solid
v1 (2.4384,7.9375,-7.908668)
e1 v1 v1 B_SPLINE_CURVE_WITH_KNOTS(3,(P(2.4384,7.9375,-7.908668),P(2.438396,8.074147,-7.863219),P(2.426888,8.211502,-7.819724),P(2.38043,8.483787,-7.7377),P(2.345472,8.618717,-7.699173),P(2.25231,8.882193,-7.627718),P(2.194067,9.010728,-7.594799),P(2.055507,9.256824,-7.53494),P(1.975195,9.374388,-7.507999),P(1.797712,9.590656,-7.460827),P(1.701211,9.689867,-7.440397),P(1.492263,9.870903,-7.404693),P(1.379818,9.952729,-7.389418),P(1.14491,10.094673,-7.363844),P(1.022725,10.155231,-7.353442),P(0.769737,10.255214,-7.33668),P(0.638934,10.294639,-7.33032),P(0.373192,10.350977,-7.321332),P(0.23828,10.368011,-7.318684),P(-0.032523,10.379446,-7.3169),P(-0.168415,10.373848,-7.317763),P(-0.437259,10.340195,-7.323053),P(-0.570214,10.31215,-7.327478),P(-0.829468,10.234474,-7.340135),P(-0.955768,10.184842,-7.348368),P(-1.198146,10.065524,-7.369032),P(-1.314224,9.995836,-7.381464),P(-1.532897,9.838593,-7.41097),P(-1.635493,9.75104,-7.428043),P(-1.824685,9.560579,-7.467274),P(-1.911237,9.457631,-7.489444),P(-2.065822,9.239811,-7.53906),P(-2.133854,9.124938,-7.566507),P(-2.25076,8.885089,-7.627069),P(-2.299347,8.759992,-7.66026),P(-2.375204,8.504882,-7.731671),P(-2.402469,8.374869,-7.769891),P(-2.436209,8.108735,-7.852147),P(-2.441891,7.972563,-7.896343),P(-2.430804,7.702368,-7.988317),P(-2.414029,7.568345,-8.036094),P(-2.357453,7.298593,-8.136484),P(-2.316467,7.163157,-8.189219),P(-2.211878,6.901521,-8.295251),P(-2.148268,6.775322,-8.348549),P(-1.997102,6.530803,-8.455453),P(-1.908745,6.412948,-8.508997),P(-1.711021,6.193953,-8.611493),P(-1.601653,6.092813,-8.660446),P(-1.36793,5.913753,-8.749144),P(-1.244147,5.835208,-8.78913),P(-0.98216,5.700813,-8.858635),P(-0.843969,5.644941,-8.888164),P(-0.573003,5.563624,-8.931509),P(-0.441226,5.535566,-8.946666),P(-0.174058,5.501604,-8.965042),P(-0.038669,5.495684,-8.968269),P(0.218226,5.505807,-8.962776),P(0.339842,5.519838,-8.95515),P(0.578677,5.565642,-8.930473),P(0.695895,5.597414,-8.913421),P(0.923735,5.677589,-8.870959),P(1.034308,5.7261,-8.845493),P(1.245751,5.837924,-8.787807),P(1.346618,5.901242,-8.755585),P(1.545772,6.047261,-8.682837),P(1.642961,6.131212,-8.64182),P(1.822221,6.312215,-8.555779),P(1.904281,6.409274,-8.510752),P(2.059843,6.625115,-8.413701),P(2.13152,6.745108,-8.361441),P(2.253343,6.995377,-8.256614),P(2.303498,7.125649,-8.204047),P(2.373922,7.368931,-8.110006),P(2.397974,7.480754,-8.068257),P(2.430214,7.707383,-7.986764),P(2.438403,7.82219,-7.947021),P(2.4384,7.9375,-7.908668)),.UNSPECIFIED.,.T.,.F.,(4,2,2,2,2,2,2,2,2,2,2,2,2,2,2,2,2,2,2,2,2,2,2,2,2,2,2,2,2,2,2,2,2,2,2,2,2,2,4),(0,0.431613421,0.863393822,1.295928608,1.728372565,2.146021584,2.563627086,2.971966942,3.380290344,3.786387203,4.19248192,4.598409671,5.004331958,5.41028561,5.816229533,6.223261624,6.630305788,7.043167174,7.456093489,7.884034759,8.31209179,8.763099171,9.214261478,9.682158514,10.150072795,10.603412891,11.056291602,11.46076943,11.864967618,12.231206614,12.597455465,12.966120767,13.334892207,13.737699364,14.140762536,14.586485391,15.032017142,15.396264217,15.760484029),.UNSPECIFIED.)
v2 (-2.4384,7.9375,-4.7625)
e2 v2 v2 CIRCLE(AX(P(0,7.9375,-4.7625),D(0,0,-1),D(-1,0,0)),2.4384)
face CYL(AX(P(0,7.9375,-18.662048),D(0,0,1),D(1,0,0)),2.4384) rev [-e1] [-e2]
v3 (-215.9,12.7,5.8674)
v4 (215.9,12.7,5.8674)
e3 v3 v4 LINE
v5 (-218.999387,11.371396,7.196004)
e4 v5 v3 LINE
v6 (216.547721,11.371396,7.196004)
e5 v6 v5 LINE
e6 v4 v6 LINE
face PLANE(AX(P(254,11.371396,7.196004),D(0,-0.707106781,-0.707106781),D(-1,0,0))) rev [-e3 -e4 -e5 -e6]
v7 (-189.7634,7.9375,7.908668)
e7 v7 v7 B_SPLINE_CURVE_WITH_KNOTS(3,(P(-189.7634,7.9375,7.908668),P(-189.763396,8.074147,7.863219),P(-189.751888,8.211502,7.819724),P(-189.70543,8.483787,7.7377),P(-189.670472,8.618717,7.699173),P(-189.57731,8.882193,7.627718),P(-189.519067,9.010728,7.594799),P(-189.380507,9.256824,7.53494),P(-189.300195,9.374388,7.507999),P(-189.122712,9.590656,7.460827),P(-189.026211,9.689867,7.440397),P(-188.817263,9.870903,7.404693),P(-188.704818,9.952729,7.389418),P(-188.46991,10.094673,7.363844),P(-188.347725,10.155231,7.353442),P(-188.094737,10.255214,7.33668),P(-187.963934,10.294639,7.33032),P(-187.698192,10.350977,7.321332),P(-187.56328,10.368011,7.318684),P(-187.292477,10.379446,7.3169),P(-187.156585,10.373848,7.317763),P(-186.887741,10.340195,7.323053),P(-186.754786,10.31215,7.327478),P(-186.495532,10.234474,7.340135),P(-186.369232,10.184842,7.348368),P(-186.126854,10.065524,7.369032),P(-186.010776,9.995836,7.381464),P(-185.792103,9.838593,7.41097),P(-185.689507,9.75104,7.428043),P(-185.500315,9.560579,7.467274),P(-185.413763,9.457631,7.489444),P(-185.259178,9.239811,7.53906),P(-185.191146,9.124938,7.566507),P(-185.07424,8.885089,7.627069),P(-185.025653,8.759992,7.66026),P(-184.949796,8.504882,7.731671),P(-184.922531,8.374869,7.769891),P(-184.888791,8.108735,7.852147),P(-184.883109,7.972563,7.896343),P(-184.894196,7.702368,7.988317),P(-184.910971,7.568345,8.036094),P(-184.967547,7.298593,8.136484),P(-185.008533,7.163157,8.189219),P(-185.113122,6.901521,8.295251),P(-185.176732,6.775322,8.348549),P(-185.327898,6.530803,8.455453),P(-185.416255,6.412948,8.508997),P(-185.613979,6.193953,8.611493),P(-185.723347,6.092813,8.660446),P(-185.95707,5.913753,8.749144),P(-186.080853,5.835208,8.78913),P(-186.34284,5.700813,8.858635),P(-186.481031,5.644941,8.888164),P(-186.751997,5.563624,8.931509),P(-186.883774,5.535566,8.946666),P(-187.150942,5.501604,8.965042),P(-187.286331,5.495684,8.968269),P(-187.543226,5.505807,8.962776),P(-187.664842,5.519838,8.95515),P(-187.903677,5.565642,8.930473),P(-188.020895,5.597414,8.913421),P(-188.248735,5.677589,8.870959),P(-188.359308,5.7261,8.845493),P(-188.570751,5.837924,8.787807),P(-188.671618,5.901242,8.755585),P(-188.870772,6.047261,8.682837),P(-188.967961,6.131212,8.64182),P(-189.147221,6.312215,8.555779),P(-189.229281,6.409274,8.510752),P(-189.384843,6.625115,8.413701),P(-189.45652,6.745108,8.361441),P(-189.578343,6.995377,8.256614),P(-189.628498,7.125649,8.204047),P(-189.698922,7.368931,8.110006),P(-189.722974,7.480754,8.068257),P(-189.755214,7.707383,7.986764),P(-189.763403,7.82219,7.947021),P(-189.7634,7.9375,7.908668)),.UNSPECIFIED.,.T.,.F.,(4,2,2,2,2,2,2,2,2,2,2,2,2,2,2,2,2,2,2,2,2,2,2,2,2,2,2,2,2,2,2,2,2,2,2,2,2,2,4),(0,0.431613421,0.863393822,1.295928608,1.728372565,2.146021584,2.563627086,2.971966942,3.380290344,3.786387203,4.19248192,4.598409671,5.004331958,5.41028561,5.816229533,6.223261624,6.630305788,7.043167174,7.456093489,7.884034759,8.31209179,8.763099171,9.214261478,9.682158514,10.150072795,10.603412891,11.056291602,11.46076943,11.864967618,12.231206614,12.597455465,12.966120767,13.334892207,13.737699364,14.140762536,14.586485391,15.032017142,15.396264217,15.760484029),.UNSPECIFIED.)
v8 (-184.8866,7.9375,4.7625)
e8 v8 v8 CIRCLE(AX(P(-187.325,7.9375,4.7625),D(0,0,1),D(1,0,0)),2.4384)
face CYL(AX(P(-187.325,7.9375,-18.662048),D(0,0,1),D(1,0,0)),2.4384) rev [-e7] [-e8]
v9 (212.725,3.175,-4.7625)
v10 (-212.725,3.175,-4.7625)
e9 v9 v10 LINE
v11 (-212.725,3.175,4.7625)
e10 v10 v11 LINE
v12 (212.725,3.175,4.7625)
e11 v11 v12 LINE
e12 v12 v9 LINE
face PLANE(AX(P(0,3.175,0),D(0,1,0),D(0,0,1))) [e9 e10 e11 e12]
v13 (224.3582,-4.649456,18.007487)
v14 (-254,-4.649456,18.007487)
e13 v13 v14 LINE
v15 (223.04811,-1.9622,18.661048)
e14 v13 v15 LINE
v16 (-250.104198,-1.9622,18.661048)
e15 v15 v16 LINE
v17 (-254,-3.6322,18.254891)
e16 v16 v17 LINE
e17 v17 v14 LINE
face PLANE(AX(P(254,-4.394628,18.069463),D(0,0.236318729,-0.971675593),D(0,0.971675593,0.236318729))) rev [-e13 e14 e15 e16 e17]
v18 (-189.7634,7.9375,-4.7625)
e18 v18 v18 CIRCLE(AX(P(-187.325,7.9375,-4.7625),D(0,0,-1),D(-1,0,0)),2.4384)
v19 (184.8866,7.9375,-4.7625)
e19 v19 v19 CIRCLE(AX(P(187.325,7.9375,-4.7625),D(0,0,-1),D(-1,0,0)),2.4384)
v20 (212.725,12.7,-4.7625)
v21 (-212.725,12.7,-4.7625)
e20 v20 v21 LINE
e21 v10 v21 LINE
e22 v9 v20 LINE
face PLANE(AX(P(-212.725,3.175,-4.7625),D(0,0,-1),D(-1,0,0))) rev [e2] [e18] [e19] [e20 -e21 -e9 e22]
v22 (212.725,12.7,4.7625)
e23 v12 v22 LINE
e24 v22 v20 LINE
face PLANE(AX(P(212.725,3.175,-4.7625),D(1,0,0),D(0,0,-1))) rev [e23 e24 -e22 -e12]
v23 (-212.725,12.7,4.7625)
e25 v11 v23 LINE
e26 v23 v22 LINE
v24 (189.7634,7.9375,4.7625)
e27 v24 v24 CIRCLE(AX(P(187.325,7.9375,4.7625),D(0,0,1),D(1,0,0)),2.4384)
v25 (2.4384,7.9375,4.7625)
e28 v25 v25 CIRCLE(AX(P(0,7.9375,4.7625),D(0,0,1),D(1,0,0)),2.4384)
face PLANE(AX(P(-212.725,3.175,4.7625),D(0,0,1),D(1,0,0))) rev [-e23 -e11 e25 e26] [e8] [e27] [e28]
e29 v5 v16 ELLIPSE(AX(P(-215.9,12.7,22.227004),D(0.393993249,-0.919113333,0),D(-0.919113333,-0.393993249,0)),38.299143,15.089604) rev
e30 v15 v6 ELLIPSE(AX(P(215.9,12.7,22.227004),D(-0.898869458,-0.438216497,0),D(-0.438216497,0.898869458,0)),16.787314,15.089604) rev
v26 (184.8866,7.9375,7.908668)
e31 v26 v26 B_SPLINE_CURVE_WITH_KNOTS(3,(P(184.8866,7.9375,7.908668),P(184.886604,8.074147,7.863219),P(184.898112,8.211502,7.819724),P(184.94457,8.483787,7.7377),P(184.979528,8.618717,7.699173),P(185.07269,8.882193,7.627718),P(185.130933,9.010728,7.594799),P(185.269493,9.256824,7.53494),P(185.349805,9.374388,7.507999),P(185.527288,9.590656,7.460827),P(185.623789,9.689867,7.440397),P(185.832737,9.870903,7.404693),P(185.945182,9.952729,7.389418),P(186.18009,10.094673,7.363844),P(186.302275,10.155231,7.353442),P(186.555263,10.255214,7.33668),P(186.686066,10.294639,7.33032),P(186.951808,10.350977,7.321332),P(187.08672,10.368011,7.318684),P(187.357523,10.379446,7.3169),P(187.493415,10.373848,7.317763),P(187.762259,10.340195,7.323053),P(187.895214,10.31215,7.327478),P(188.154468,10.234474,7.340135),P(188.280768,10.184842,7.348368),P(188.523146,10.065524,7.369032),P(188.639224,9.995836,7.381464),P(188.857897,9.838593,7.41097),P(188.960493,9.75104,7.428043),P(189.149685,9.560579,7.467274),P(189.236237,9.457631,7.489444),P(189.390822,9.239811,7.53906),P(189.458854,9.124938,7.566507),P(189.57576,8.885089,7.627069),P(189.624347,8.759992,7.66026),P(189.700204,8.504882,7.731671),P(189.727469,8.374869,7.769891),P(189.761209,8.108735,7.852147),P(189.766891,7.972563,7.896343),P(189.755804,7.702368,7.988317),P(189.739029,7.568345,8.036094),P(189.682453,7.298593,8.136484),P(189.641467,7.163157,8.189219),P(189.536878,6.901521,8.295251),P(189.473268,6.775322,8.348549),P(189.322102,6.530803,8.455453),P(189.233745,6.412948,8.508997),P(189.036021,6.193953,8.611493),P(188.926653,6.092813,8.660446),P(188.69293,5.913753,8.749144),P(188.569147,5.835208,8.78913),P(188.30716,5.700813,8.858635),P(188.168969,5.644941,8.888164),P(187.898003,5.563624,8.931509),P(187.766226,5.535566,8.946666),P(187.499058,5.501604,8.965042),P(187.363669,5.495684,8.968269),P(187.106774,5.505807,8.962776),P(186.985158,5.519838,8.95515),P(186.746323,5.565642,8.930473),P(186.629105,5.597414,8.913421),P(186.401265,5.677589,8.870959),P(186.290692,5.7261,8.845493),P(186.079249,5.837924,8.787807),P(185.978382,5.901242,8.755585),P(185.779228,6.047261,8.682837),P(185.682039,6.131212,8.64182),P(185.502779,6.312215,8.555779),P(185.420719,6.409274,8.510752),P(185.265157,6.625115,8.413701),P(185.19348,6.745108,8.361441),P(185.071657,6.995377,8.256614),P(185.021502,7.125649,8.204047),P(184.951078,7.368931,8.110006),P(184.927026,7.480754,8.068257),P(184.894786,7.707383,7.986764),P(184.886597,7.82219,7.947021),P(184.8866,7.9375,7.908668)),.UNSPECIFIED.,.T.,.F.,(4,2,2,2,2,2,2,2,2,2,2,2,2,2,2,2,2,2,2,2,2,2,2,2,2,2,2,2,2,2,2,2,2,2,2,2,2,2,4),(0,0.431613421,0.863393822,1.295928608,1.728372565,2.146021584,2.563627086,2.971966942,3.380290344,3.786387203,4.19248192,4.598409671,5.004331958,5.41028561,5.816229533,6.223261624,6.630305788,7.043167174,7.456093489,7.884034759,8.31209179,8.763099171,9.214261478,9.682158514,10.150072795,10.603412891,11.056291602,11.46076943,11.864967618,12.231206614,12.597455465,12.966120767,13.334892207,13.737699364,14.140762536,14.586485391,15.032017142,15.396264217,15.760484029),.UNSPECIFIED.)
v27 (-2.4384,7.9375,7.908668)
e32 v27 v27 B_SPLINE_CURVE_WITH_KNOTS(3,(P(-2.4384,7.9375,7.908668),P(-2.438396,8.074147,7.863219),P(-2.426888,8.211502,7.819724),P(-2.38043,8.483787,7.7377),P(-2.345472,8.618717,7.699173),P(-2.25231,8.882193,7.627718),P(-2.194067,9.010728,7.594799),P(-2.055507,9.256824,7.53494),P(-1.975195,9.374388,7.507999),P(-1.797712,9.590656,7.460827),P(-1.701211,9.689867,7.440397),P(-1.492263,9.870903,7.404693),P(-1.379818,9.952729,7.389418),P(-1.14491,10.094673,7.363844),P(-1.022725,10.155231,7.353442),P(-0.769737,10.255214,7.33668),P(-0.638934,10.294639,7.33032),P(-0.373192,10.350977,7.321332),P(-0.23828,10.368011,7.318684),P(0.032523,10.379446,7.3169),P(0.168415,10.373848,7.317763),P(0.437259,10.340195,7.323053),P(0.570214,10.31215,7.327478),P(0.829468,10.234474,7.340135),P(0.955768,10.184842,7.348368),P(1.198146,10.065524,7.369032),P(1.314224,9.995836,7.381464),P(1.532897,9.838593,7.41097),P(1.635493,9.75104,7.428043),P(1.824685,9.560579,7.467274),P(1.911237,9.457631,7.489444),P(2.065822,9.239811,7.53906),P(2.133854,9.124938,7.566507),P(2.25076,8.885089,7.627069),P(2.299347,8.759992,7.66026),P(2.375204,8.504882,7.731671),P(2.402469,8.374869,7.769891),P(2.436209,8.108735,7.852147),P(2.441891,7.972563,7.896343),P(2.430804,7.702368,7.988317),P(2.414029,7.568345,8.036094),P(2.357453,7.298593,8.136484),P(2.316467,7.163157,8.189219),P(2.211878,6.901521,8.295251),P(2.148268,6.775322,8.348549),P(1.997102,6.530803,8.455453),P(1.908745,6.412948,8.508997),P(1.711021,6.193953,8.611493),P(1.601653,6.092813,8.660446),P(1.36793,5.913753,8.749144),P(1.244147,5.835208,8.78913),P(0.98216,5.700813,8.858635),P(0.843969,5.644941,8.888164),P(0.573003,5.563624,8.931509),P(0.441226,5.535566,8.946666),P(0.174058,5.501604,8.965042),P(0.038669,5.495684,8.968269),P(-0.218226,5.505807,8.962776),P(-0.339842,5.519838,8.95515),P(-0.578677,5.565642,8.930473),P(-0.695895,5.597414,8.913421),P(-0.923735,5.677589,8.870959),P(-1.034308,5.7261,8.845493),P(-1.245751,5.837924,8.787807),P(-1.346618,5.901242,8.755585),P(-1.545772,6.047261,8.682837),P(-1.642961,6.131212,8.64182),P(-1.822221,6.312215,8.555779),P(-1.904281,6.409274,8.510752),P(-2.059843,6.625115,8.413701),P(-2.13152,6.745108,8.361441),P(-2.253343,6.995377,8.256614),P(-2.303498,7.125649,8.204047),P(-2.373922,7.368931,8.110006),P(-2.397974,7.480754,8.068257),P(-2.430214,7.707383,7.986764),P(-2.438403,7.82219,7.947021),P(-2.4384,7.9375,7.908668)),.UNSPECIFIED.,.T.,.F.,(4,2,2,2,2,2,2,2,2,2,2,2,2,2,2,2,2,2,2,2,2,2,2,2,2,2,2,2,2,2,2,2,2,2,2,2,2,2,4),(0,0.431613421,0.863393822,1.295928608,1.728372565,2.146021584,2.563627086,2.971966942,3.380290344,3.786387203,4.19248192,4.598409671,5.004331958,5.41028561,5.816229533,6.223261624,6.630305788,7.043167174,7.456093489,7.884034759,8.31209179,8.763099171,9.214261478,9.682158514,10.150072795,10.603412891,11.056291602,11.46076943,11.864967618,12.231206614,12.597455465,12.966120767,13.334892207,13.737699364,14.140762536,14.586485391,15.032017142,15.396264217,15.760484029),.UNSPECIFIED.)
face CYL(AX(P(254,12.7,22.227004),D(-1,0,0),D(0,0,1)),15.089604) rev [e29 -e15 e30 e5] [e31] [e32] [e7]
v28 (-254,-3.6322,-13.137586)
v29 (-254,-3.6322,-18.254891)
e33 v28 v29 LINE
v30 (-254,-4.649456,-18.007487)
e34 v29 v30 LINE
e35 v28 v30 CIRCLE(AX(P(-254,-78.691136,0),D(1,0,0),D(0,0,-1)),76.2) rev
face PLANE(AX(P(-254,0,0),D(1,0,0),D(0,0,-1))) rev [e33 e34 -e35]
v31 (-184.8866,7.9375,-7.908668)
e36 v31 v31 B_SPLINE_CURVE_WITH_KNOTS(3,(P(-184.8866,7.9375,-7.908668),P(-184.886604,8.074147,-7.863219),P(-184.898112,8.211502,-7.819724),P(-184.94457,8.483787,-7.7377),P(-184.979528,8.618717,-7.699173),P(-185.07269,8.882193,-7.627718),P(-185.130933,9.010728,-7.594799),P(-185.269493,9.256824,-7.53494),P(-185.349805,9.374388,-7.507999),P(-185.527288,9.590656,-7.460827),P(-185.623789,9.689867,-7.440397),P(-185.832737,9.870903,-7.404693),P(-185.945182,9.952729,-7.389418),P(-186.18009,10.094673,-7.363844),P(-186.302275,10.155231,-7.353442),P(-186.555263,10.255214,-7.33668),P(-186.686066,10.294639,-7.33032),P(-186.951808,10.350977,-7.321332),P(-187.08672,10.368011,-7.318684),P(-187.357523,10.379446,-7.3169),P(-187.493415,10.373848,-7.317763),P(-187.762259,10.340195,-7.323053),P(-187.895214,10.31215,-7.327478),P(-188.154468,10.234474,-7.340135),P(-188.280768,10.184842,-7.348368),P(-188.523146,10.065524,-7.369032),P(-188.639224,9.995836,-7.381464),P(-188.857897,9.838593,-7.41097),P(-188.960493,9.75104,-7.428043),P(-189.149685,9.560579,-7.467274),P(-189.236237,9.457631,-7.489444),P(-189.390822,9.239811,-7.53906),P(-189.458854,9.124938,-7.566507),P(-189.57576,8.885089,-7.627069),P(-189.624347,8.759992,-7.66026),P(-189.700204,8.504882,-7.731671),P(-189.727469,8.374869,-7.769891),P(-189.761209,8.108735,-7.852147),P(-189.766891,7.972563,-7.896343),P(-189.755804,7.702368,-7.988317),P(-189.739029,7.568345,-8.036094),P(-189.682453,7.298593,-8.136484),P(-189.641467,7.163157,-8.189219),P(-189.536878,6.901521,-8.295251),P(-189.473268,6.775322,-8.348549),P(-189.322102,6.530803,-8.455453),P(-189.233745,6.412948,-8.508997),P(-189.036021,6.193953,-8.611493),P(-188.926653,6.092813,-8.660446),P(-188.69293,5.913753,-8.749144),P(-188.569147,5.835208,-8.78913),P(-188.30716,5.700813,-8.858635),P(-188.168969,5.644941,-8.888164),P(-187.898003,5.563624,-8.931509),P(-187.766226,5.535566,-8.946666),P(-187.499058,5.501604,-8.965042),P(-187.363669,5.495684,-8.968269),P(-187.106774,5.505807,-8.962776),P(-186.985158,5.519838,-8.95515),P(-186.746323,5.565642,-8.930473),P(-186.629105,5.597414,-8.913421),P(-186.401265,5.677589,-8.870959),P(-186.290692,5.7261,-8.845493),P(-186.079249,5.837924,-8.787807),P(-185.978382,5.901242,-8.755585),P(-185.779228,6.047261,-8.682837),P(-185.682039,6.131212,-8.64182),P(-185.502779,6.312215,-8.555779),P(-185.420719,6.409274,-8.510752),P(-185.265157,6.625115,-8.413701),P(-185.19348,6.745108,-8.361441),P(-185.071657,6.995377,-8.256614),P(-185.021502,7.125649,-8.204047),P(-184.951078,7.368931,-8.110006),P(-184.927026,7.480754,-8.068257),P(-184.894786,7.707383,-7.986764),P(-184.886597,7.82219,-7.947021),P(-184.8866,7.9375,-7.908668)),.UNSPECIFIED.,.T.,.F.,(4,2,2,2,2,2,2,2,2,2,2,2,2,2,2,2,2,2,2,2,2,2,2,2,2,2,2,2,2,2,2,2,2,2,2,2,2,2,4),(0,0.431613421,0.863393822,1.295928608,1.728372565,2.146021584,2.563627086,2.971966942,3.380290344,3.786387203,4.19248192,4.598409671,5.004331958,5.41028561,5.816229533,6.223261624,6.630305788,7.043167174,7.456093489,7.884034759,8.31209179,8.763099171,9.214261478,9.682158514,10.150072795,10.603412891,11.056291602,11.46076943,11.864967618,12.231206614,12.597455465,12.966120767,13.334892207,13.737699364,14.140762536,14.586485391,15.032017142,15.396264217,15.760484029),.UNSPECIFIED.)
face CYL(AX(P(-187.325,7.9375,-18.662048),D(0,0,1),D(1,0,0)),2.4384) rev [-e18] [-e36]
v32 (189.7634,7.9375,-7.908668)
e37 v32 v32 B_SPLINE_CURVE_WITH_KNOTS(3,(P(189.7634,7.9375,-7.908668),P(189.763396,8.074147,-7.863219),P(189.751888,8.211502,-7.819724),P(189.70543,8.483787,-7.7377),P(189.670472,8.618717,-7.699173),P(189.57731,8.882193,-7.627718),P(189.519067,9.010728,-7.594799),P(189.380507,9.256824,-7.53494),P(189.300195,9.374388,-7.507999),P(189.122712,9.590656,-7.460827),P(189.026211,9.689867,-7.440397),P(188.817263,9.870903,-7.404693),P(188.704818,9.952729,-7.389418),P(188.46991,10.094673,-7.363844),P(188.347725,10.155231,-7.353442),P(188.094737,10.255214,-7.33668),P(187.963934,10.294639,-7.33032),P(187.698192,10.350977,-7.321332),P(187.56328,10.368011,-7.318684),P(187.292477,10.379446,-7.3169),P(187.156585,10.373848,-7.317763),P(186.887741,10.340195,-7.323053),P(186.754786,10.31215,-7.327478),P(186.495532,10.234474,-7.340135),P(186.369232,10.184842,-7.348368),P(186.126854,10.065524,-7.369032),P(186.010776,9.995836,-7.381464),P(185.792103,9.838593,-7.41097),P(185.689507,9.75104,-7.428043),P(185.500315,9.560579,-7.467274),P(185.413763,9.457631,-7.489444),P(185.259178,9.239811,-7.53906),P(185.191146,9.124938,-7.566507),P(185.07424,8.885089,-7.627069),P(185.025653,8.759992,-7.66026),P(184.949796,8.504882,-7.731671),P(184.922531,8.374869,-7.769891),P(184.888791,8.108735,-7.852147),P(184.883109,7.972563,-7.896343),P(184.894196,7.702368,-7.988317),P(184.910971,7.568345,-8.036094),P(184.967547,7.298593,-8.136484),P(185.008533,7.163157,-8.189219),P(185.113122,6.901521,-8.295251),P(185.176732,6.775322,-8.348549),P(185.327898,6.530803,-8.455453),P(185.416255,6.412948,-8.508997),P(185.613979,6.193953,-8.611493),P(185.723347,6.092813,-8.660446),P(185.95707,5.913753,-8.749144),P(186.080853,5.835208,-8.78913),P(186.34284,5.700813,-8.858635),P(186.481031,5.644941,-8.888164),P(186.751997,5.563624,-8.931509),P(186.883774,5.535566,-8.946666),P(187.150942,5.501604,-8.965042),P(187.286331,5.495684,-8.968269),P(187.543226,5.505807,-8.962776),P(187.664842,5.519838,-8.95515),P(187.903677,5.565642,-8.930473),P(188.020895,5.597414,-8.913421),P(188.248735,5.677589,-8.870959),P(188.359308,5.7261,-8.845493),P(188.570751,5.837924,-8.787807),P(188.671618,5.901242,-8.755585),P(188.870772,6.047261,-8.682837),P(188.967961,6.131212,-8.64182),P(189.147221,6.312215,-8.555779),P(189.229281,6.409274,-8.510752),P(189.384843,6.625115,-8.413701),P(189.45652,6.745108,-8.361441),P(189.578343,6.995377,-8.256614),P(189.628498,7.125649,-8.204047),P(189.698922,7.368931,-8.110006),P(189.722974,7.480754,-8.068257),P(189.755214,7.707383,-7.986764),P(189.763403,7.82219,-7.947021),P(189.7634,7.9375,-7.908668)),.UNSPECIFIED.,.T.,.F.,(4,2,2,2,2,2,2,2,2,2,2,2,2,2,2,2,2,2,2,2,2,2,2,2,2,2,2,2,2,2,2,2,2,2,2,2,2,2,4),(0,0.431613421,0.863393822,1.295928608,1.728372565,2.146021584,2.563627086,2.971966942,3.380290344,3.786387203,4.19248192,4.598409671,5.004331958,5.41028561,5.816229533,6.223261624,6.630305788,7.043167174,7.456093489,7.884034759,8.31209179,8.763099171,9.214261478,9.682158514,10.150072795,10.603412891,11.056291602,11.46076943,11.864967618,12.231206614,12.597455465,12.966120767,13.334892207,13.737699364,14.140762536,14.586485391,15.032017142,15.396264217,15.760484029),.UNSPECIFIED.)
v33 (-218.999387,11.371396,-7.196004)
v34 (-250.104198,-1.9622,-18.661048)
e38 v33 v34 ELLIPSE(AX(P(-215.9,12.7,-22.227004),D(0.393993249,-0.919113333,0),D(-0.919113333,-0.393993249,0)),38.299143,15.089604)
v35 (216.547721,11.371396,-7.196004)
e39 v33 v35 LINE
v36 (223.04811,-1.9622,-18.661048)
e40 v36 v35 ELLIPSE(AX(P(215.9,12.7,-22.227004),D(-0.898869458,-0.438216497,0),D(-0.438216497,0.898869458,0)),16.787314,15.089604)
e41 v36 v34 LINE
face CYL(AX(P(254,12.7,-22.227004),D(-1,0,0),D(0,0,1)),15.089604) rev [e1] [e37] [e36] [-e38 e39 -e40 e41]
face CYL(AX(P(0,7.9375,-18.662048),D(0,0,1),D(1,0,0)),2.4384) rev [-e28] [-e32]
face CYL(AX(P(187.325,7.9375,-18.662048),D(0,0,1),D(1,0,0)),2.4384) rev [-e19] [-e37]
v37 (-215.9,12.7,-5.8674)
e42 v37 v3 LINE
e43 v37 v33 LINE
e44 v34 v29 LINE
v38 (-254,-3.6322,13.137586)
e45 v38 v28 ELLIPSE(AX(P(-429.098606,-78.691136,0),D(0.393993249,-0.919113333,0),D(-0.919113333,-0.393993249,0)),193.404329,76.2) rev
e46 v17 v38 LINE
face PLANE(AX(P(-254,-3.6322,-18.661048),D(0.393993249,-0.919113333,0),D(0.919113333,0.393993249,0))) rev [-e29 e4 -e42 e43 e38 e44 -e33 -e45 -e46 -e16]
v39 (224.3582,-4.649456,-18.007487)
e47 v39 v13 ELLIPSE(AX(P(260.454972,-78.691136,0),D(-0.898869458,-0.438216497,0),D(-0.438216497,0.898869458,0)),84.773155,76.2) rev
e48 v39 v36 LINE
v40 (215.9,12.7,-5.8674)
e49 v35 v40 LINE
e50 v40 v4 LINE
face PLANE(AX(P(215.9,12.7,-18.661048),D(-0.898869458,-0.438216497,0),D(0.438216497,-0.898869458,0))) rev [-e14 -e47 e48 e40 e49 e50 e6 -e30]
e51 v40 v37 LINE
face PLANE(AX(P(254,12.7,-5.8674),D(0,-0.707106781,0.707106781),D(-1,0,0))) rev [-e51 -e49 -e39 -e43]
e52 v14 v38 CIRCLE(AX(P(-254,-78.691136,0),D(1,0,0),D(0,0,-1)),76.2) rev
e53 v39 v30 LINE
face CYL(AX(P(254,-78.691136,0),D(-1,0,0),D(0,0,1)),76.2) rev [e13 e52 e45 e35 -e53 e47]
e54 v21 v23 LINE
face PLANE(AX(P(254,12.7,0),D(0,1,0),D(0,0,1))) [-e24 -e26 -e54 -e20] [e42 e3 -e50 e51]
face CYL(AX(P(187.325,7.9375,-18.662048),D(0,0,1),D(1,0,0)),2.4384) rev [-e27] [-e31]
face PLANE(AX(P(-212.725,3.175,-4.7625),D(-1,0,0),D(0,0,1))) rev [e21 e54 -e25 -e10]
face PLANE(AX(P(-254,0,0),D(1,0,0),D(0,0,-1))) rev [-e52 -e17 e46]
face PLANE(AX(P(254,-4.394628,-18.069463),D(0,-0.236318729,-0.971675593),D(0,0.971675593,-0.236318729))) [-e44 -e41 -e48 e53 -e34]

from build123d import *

# Parameters (mm, degrees)
BOSS_EXTRUDE1_DEPTH                 = 254
CUT_EXTRUDE1_DEPTH                  = 263.150751027
SKETCH3_W                           = 425.45
SKETCH3_H                           = 9.525
CUT_EXTRUDE2_DEPTH                  = 9.525
CUT_EXTRUDE3_REACH                  = 257.394
CUT_EXTRUDE3_END_RADIUS             = 15.089603758
SKETCH6_R                           = 2.4384
CUT_EXTRUDE3_DIRECTION_2_REACH      = 257.394
CUT_EXTRUDE3_DIRECTION_2_END_RADIUS = 15.089603758
CHAMFER1_SIZE                       = 1.27


with BuildPart() as part:
    # Sketch1 → Boss-Extrude1 (new, symmetric)
    with BuildSketch(Plane(origin=(0, 0, 0), x_dir=(0, 0, -1), z_dir=(1, 0, 0))):
        with BuildLine():
            Line((-7.1374, 12.7), (7.1374, 12.7))
            ThreePointArc((7.1374, 12.7), (10.363087786, 3.375642683), (18.661047774, -1.962199681))
            Line((18.661047774, -1.962199681), (18.00748716, -4.649455573))
            ThreePointArc((18.00748716, -4.649455573), (0, -2.491135768), (-18.00748716, -4.649455573))
            Line((-18.00748716, -4.649455573), (-18.661047774, -1.962199681))
            ThreePointArc((-18.661047774, -1.962199681), (-10.363087786, 3.375642683), (-7.1374, 12.7))
        make_face()
    extrude(amount=BOSS_EXTRUDE1_DEPTH, both=True)

    # Sketch2 → Cut-Extrude1 (cut, through all)
    with BuildSketch(Plane.XY.offset(44.944976028)):
        Polygon((-254, 12.7), (-215.9, 12.7), (-254, -3.6322), align=None)
        Polygon((254, -4.649455573), (224.3582, -4.649455573), (215.9, 12.7), (254, 12.7), align=None)
    extrude(amount=-CUT_EXTRUDE1_DEPTH, mode=Mode.SUBTRACT)

    # Sketch3 → Cut-Extrude2 (cut)
    with BuildSketch(Plane(origin=(0, 12.7, 0), x_dir=(1, 0, 0), z_dir=(0, 1, 0))):
        Rectangle(SKETCH3_W, SKETCH3_H)
    extrude(amount=-CUT_EXTRUDE2_DEPTH, mode=Mode.SUBTRACT)

    # Cut-Extrude3: up to this cylinder (the profile starts outside it)
    cut_extrude3_end = Plane(origin=(0, 12.7, -22.227003758), z_dir=(-1, 0, 0)) * Cylinder(CUT_EXTRUDE3_END_RADIUS, 920.617207515, mode=Mode.PRIVATE)
    # Sketch6 → Cut-Extrude3 (cut, up to the surface)
    with BuildSketch(Plane.XY.offset(-4.7625), mode=Mode.PRIVATE) as cut_extrude3_sk1:
        with Locations((-187.325, 7.9375)):
            Circle(SKETCH6_R)
    cut_extrude3_tool1 = extrude(cut_extrude3_sk1.sketch, amount=-CUT_EXTRUDE3_REACH, mode=Mode.PRIVATE) - cut_extrude3_end
    add(cut_extrude3_tool1.solids().sort_by_distance((-187.325, 7.9375, -4.7625))[0], mode=Mode.SUBTRACT)
    # Sketch6 → Cut-Extrude3 (cut, up to the surface)
    with BuildSketch(Plane.XY.offset(-4.7625), mode=Mode.PRIVATE) as cut_extrude3_sk2:
        with Locations((187.325, 7.9375)):
            Circle(SKETCH6_R)
    cut_extrude3_tool2 = extrude(cut_extrude3_sk2.sketch, amount=-CUT_EXTRUDE3_REACH, mode=Mode.PRIVATE) - cut_extrude3_end
    add(cut_extrude3_tool2.solids().sort_by_distance((187.325, 7.9375, -4.7625))[0], mode=Mode.SUBTRACT)
    # Sketch6 → Cut-Extrude3 (cut, up to the surface)
    with BuildSketch(Plane.XY.offset(-4.7625), mode=Mode.PRIVATE) as cut_extrude3_sk3:
        with Locations((0, 7.9375)):
            Circle(SKETCH6_R)
    cut_extrude3_tool3 = extrude(cut_extrude3_sk3.sketch, amount=-CUT_EXTRUDE3_REACH, mode=Mode.PRIVATE) - cut_extrude3_end
    add(cut_extrude3_tool3.solids().sort_by_distance((0, 7.9375, -4.7625))[0], mode=Mode.SUBTRACT)

    # Cut-Extrude3 direction 2: up to this cylinder (the profile starts outside it)
    cut_extrude3_direction_2_end = Plane(origin=(0, 12.7, 22.227003758), z_dir=(-1, 0, 0)) * Cylinder(CUT_EXTRUDE3_DIRECTION_2_END_RADIUS, 920.617207515, mode=Mode.PRIVATE)
    # Sketch6 → Cut-Extrude3 direction 2 (cut, up to the surface)
    with BuildSketch(Plane.XY.offset(-4.7625), mode=Mode.PRIVATE) as cut_extrude3_direction_2_sk1:
        with Locations((-187.325, 7.9375)):
            Circle(SKETCH6_R)
    cut_extrude3_direction_2_tool1 = extrude(cut_extrude3_direction_2_sk1.sketch, amount=CUT_EXTRUDE3_DIRECTION_2_REACH, mode=Mode.PRIVATE) - cut_extrude3_direction_2_end
    add(cut_extrude3_direction_2_tool1.solids().sort_by_distance((-187.325, 7.9375, -4.7625))[0], mode=Mode.SUBTRACT)
    # Sketch6 → Cut-Extrude3 direction 2 (cut, up to the surface)
    with BuildSketch(Plane.XY.offset(-4.7625), mode=Mode.PRIVATE) as cut_extrude3_direction_2_sk2:
        with Locations((187.325, 7.9375)):
            Circle(SKETCH6_R)
    cut_extrude3_direction_2_tool2 = extrude(cut_extrude3_direction_2_sk2.sketch, amount=CUT_EXTRUDE3_DIRECTION_2_REACH, mode=Mode.PRIVATE) - cut_extrude3_direction_2_end
    add(cut_extrude3_direction_2_tool2.solids().sort_by_distance((187.325, 7.9375, -4.7625))[0], mode=Mode.SUBTRACT)
    # Sketch6 → Cut-Extrude3 direction 2 (cut, up to the surface)
    with BuildSketch(Plane.XY.offset(-4.7625), mode=Mode.PRIVATE) as cut_extrude3_direction_2_sk3:
        with Locations((0, 7.9375)):
            Circle(SKETCH6_R)
    cut_extrude3_direction_2_tool3 = extrude(cut_extrude3_direction_2_sk3.sketch, amount=CUT_EXTRUDE3_DIRECTION_2_REACH, mode=Mode.PRIVATE) - cut_extrude3_direction_2_end
    add(cut_extrude3_direction_2_tool3.solids().sort_by_distance((0, 7.9375, -4.7625))[0], mode=Mode.SUBTRACT)

    # Chamfer1
    # the kernel refuses this chamfer: 1.27 mm, written as the material it takes off along each edge
    with BuildSketch(Plane(origin=(219.319487902, 12.7, -7.1374), x_dir=(0, 0, 1), z_dir=(-1, 0, 0))) as chamfer1_piece_1:
        with BuildLine():
            Line((CHAMFER1_SIZE, 0), (-0.058604027, -1.328604027))
            ThreePointArc((-0.058604027, -1.328604027), (-0.015497105, -0.683703283), (0, 0))
            Line((0, 0), (CHAMFER1_SIZE, 0))
        make_face()
    extrude(amount=438.638975803, mode=Mode.SUBTRACT)
    with BuildSketch(Plane(origin=(219.319487902, 12.7, 7.1374), x_dir=(0, -0.9990285943565428, 0.04406662748600431), z_dir=(-1, 0, 0))) as chamfer1_piece_2:
        with BuildLine():
            Line((1.329895895, 0), (-CHAMFER1_SIZE * 0.044066627486, -CHAMFER1_SIZE * 0.999028594357))
            Line((-CHAMFER1_SIZE * 0.044066627486, -CHAMFER1_SIZE * 0.999028594357), (0, 0))
            ThreePointArc((0, 0), (0.683722035, -0.014646447), (1.329895895, 0))
        make_face()
    extrude(amount=438.638975803, mode=Mode.SUBTRACT)


solid = part.part
